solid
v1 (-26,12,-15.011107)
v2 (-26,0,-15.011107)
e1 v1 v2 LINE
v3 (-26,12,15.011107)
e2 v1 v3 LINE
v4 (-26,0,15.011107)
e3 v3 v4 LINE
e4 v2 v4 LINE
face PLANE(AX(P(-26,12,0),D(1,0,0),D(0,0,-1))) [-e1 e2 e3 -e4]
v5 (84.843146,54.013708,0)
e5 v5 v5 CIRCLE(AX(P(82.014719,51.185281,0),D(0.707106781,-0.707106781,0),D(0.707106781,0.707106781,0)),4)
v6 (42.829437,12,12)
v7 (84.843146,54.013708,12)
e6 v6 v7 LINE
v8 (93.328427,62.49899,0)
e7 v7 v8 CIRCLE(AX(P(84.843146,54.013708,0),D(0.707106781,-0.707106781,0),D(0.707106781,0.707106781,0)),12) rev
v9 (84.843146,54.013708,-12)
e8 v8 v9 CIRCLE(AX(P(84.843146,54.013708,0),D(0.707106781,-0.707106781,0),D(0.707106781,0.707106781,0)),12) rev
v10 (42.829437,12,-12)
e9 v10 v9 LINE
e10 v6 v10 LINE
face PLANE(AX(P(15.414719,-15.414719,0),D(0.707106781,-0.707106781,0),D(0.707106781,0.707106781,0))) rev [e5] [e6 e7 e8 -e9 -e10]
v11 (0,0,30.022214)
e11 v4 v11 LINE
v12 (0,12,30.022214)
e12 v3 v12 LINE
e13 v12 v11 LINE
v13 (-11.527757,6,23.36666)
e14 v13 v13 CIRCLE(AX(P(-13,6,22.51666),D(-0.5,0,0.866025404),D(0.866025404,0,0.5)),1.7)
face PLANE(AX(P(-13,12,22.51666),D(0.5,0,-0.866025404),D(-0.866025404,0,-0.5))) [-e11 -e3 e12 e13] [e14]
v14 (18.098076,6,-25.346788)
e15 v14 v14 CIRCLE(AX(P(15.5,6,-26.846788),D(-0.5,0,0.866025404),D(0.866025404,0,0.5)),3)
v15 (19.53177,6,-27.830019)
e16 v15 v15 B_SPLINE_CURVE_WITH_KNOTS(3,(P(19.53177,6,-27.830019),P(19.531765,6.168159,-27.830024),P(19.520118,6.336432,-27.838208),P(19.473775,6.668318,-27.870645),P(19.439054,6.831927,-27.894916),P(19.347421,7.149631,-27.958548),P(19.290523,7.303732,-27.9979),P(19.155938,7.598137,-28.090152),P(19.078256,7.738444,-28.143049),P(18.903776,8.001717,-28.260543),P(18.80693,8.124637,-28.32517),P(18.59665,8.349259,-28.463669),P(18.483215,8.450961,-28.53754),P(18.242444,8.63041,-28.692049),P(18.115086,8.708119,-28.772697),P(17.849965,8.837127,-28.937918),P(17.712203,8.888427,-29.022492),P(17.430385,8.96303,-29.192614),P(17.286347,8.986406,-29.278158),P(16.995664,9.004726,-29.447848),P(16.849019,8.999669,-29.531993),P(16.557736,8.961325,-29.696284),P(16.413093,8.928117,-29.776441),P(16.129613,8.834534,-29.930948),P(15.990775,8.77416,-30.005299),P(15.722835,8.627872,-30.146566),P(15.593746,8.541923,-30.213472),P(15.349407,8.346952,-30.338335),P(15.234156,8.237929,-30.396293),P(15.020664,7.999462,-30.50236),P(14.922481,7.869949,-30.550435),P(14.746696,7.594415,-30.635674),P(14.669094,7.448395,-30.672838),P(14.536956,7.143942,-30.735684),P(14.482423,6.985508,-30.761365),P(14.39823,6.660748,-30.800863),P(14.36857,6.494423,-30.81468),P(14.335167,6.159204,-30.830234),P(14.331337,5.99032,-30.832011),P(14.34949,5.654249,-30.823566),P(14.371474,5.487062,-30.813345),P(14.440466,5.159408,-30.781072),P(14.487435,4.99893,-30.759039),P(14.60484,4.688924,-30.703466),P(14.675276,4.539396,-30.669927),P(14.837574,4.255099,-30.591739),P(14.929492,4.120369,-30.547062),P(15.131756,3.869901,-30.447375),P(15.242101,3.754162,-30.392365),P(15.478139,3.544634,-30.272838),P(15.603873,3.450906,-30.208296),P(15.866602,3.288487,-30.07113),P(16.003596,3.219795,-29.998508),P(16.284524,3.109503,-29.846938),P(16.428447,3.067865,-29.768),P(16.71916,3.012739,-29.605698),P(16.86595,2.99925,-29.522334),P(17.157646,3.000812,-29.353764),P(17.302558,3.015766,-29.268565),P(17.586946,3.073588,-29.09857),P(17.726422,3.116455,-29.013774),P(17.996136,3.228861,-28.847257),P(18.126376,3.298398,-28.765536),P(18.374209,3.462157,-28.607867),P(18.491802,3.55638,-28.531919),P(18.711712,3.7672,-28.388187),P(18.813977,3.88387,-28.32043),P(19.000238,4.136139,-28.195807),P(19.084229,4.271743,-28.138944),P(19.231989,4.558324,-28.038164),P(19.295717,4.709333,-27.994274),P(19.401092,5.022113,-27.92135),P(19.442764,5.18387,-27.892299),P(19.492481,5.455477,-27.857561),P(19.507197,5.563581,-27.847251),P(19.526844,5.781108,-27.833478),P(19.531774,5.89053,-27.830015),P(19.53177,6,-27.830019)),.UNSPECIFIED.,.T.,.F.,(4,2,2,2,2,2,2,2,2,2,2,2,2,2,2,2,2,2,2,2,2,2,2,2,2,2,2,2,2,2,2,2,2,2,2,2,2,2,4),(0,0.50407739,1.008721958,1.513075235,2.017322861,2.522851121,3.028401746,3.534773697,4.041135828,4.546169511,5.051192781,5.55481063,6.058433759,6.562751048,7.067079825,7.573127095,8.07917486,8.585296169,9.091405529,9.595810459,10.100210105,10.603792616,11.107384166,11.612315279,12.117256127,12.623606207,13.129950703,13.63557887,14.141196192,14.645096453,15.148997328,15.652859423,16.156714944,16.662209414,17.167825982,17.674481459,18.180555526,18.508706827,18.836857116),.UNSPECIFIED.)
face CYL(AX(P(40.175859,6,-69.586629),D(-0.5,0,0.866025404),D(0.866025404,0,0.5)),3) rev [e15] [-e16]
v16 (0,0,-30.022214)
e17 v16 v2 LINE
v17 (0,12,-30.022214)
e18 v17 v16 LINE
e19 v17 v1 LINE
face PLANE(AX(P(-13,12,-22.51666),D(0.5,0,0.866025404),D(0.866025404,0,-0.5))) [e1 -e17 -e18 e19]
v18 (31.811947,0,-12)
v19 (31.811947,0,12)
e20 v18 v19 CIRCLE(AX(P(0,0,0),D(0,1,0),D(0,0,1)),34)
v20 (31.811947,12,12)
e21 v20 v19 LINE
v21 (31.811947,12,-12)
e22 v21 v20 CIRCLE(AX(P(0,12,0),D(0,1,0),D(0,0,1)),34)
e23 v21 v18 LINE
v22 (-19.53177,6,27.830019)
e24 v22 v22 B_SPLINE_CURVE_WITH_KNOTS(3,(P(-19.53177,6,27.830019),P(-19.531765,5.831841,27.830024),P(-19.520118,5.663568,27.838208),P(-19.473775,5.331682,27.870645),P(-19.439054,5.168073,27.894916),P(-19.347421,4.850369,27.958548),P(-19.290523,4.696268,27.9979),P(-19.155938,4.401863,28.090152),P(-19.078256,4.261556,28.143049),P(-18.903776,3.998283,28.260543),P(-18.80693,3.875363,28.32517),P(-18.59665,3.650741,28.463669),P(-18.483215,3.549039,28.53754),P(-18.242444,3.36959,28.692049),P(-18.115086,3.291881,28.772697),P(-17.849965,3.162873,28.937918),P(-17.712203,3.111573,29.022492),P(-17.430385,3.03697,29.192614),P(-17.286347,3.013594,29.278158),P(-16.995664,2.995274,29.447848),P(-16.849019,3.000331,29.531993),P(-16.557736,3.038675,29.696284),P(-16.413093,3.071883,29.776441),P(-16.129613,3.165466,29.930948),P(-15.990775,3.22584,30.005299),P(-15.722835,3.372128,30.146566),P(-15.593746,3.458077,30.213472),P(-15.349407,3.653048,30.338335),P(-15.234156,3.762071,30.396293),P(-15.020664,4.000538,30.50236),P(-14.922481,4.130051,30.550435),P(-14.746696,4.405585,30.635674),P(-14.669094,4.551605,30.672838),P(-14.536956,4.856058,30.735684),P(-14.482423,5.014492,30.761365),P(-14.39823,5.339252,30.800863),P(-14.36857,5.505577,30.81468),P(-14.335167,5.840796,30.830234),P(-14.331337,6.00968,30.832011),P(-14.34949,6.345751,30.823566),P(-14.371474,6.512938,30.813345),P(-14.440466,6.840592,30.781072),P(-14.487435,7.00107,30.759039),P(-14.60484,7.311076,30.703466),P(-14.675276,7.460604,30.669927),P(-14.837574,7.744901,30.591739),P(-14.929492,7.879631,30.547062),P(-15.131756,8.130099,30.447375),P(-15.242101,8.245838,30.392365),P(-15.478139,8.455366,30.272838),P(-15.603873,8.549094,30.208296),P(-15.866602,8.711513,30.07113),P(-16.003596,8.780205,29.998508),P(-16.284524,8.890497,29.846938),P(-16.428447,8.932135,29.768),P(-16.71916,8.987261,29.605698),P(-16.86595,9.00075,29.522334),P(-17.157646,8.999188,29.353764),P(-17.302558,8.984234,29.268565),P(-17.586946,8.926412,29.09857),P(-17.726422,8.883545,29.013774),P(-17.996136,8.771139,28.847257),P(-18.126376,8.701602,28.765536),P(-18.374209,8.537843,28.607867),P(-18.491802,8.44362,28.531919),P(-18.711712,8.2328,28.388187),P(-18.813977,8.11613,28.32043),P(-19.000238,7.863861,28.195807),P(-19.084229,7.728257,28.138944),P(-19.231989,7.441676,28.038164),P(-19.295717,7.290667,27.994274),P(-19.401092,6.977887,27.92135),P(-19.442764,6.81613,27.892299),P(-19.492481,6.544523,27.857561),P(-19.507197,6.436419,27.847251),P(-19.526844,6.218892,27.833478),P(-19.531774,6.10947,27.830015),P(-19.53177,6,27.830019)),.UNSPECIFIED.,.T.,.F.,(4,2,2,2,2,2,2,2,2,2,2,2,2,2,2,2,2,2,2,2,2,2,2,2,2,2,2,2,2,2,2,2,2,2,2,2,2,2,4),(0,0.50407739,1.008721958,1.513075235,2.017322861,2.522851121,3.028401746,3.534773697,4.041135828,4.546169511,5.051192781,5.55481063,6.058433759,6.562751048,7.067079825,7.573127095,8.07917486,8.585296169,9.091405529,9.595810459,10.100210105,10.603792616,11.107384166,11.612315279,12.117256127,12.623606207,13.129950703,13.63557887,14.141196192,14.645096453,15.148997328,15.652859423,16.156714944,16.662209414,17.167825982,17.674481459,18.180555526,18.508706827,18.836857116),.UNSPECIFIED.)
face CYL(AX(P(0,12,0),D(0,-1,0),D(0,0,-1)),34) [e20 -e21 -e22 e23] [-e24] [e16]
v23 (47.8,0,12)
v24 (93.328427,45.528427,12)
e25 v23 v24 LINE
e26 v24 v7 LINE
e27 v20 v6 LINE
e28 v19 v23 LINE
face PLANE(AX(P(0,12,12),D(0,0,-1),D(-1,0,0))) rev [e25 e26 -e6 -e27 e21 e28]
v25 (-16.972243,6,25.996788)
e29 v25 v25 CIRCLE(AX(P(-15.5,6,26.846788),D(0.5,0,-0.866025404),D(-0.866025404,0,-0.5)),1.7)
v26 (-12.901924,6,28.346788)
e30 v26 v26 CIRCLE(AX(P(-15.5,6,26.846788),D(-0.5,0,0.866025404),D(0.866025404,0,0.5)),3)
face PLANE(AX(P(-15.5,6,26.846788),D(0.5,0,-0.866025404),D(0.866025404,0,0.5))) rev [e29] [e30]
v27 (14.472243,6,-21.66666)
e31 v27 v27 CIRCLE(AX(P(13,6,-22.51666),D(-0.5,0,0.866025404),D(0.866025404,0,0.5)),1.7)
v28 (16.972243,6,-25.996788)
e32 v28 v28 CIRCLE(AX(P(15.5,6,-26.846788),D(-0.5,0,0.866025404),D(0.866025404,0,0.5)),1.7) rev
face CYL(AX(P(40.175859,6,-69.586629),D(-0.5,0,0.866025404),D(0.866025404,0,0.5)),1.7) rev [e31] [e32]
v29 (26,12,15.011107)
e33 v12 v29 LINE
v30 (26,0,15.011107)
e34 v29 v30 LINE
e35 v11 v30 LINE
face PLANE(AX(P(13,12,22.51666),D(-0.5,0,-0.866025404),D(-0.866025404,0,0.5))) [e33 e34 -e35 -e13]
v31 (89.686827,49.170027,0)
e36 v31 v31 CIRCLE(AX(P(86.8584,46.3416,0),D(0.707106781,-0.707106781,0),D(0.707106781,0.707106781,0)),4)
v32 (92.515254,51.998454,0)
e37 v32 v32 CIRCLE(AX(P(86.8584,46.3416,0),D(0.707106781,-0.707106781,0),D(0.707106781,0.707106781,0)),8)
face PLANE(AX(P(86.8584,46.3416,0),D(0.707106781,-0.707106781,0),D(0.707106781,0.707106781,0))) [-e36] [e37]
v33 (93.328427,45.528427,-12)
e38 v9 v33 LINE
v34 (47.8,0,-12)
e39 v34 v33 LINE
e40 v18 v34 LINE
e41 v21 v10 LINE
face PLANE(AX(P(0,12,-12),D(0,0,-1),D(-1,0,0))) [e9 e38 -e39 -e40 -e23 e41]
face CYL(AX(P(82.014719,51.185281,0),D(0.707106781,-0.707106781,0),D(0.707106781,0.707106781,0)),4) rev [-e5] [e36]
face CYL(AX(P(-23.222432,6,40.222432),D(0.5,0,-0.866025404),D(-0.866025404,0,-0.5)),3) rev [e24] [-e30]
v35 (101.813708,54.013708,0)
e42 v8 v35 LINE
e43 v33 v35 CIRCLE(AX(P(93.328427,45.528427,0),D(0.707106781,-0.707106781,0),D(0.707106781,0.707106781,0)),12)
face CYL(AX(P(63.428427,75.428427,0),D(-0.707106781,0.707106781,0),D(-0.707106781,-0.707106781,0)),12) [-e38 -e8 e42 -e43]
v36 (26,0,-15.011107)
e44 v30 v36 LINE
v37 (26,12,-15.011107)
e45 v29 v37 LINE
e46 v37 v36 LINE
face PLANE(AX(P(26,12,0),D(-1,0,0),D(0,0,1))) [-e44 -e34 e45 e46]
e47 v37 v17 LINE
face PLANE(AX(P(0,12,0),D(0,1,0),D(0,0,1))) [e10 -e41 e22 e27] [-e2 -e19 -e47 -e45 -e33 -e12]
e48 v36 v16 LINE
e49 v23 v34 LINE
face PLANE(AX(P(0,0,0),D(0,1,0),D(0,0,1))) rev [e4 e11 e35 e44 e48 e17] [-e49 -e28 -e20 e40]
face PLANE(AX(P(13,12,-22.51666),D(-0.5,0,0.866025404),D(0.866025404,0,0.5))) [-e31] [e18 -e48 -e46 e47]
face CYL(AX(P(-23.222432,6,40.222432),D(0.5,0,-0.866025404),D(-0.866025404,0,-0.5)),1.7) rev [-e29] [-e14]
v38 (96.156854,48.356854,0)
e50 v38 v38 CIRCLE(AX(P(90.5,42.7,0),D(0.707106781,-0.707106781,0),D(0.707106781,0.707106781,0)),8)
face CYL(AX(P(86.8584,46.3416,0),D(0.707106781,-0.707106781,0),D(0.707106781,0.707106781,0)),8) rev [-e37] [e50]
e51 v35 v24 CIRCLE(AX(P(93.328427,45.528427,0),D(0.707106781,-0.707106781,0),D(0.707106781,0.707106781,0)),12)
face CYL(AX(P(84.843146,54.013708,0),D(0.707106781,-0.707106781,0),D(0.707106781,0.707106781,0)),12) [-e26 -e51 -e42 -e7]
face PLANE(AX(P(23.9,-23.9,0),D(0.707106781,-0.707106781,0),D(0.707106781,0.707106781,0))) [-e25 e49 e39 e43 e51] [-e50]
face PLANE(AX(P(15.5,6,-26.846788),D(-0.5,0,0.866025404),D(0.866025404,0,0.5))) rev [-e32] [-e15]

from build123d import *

# Parameters (mm, degrees)
BOSS_EXTRUDE1_DEPTH = 12
SKETCH4_W           = 76.386919113
SKETCH4_H           = 24
SKETCH4_R           = 4
BOSS_EXTRUDE2_DEPTH = 12
SKETCH4_3_R         = 8
SKETCH4_3_R_2       = 4
CUT_EXTRUDE1_DEPTH  = 5.15
FILLET1_R           = 12
SKETCH5_R           = 1.7
CUT_EXTRUDE2_DEPTH  = 123.426024465
CUT_EXTRUDE3_START  = -5
SKETCH5_3_R         = 3
CUT_EXTRUDE3_DEPTH  = 118.426024512


with BuildPart() as part:
    # Sketch3 → Boss-Extrude1 (new body)
    with BuildSketch(Plane(origin=(0, 0, 0), x_dir=(1, 0, 0), z_dir=(0, 1, 0))):
        with BuildLine():
            Line((-26, 15.011106999), (0, 30.022213998))
            Line((0, 30.022213998), (26, 15.011106999))
            Line((26, 15.011106999), (26, 12))
            Line((26, 12), (31.811947441, 12))
            ThreePointArc((31.811947441, 12), (-34, 0), (31.811947441, -12))
            Line((31.811947441, -12), (26, -12))
            Line((26, -12), (26, -15.011106999))
            Line((26, -15.011106999), (0, -30.022213998))
            Line((0, -30.022213998), (-26, -15.011106999))
            Line((-26, -15.011106999), (-26, 15.011106999))
        make_face()
        with BuildLine():
            Line((31.811947441, 12), (26, 12))
            Line((26, 12), (26, -12))
            Line((26, -12), (31.811947441, -12))
            ThreePointArc((31.811947441, -12), (33.448514264, -6.098925602), (34, 0))
            ThreePointArc((34, 0), (33.448514264, 6.098925602), (31.811947441, 12))
        make_face()
        with BuildLine():
            Line((47.8, 12), (31.811947441, 12))
            ThreePointArc((31.811947441, 12), (33.448514264, 6.098925602), (34, 0))
            ThreePointArc((34, 0), (33.448514264, -6.098925602), (31.811947441, -12))
            Line((31.811947441, -12), (47.8, -12))
            Line((47.8, -12), (47.8, 12))
        make_face()
    extrude(amount=BOSS_EXTRUDE1_DEPTH)

    # Sketch4 → Boss-Extrude2 (add)
    with BuildSketch(Plane(origin=(23.9, -23.9, 0), x_dir=(0.7071067811865462, 0.707106781186549, 0), z_dir=(0.707106781186549, -0.7071067811865462, 0))):
        with Locations((71.993163698, 0)):
            Rectangle(SKETCH4_W, SKETCH4_H)
        with Locations((94.186623254, 0)):
            Circle(SKETCH4_R, mode=Mode.SUBTRACT)
    extrude(amount=-BOSS_EXTRUDE2_DEPTH)

    # Sketch4<3> → Cut-Extrude1 (cut)
    with BuildSketch(Plane(origin=(23.9, -23.9, 0), x_dir=(0.7071067811865462, 0.707106781186549, 0), z_dir=(0.707106781186549, -0.7071067811865462, 0))):
        with Locations((94.186623254, 0)):
            Circle(SKETCH4_3_R)
        with Locations((94.186623254, 0)):
            Circle(SKETCH4_3_R_2, mode=Mode.SUBTRACT)
    extrude(amount=-CUT_EXTRUDE1_DEPTH, mode=Mode.SUBTRACT)

    # Fillet1
    fillet1_edges = [part.edges().sort_by_distance(p)[0] for p in [
        (97.571067812, 58.256349186, -12),
        (97.571067812, 58.256349186, 12),
    ]]
    fillet(fillet1_edges, radius=FILLET1_R - 0.0001)  # a hair under: the kernel refuses the full size

    # Sketch5 → Cut-Extrude2 (cut, through all)
    with BuildSketch(Plane(origin=(13, 0, -22.516660498), x_dir=(0.8660254037844415, 0, 0.4999999999999951), z_dir=(-0.49999999999999517, 0, 0.8660254037844416))):
        with Locations((0, 6)):
            Circle(SKETCH5_R)
    cut_extrude2 = extrude(amount=-CUT_EXTRUDE2_DEPTH, mode=Mode.SUBTRACT)

    # Sketch5<3> → Cut-Extrude3 (cut, through all)
    with BuildSketch(Plane(origin=(13, 0, -22.516660498), x_dir=(0.8660254037844415, 0, 0.4999999999999951), z_dir=(-0.49999999999999517, 0, 0.8660254037844416)).offset(CUT_EXTRUDE3_START)):
        with Locations((0, 6)):
            Circle(SKETCH5_3_R)
    cut_extrude3 = extrude(amount=-CUT_EXTRUDE3_DEPTH, mode=Mode.SUBTRACT)

    # Mirror1: Cut-Extrude2, Cut-Extrude3 across plane
    add(cut_extrude2.mirror(Plane(origin=(0, 0, 0), x_dir=(0.8660254037844415, 0, 0.49999999999999517), z_dir=(-0.49999999999999506, 0, 0.8660254037844415))), mode=Mode.SUBTRACT)
    add(cut_extrude3.mirror(Plane(origin=(0, 0, 0), x_dir=(0.8660254037844415, 0, 0.49999999999999517), z_dir=(-0.49999999999999506, 0, 0.8660254037844415))), mode=Mode.SUBTRACT)


solid = part.part
